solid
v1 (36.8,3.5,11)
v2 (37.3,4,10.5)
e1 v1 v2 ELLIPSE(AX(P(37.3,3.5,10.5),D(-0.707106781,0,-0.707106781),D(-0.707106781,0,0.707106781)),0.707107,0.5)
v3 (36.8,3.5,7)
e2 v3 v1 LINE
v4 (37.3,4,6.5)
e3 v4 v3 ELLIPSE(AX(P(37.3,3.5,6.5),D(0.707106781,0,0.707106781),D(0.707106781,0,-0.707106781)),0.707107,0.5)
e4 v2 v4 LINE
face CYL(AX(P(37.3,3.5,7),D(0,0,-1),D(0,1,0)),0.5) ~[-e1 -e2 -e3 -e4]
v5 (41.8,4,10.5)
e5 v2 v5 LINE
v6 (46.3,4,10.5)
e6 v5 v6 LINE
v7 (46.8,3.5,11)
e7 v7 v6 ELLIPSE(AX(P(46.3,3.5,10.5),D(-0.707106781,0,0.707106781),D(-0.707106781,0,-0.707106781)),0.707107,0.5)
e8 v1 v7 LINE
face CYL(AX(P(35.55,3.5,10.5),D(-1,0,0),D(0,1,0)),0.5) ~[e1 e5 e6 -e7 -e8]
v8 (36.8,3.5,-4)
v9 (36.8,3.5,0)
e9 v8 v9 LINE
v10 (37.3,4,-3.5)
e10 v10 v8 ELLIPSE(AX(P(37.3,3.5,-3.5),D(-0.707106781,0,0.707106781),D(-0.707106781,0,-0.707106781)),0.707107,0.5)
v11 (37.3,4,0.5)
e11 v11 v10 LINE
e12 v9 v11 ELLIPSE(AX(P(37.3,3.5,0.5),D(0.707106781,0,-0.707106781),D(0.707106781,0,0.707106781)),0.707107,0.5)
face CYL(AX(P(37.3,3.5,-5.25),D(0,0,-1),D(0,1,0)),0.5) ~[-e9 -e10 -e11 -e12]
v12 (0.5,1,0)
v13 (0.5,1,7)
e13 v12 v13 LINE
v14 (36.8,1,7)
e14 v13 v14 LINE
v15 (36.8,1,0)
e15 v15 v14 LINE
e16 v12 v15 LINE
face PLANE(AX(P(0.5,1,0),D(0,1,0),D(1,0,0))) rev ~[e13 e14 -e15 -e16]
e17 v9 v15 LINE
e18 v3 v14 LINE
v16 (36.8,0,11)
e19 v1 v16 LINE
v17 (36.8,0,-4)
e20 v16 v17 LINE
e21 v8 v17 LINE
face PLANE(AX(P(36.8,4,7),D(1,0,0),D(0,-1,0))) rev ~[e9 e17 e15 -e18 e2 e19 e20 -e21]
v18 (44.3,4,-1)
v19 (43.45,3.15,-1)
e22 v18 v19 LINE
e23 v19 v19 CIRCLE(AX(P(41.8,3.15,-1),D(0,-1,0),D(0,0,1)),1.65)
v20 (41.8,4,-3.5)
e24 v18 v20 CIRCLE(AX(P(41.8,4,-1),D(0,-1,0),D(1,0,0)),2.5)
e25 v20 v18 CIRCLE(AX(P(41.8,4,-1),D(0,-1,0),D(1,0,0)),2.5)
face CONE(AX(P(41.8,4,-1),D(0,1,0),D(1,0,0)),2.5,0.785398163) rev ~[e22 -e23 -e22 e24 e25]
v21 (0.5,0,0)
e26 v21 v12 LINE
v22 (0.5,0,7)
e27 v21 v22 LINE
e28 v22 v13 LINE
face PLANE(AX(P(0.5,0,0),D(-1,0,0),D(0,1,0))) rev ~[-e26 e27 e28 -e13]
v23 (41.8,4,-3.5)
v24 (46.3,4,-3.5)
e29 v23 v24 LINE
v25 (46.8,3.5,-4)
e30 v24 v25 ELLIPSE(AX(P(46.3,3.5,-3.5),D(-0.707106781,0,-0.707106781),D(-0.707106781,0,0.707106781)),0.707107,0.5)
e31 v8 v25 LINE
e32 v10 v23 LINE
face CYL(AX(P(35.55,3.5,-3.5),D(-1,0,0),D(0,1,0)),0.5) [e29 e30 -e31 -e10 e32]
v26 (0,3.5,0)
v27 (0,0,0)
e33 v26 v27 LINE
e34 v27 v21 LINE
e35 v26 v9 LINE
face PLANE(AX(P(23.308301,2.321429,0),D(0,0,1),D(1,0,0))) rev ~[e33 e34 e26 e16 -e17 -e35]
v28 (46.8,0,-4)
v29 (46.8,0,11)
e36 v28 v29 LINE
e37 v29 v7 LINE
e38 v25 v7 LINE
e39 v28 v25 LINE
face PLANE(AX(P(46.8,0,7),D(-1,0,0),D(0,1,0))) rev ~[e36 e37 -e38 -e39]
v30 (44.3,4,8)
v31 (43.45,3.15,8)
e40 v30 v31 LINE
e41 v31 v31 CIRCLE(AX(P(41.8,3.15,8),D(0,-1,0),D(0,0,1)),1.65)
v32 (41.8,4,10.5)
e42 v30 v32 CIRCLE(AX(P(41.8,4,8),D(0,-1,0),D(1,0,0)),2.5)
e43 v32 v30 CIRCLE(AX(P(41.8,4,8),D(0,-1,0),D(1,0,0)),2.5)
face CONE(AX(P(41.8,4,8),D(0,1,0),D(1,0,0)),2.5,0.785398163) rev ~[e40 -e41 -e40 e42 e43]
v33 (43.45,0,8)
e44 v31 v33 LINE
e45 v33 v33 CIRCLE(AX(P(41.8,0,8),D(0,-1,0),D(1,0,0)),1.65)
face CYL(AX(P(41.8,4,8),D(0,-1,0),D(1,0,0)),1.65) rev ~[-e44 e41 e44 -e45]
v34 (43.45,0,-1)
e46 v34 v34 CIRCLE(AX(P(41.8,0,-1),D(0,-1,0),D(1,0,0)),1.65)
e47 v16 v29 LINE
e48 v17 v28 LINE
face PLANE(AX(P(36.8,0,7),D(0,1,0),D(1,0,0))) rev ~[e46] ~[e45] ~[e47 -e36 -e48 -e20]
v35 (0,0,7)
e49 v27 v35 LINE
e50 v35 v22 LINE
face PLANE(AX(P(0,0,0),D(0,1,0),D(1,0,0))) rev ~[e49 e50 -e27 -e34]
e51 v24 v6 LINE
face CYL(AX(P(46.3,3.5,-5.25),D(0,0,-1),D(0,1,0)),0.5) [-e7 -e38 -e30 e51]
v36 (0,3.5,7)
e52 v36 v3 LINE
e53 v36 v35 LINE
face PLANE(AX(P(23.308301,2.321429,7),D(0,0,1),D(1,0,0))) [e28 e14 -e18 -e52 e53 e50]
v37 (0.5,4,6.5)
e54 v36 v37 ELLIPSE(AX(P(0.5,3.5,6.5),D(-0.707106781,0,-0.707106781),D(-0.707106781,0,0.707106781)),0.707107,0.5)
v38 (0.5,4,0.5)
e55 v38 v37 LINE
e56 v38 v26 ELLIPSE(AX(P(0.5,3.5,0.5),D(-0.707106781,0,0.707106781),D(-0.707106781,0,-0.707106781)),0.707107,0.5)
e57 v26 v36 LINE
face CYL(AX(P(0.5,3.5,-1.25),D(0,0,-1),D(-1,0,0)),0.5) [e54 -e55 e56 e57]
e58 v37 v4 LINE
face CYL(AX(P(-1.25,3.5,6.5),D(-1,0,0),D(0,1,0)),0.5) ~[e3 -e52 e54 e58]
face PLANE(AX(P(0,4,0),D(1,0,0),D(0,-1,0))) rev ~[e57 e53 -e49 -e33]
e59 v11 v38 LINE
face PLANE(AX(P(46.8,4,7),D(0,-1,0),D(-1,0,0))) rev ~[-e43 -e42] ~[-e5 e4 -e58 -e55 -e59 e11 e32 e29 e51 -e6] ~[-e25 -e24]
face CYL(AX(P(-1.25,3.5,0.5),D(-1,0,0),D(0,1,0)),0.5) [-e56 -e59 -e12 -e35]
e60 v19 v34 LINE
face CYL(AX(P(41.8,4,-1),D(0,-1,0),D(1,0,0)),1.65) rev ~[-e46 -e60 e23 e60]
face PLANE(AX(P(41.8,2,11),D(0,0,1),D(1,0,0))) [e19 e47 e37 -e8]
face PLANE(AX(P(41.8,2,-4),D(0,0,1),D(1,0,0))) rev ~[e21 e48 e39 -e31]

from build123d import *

# Parameters (mm, degrees)
F3_DEPTH       = 7
F5_DEPTH       = 4
F5_DEPTH_BACK  = 11
F7_D           = 3.3
F7_CSINK_D     = 5
F7_CSINK_ANGLE = 90
F8_T1_DEPTH    = 38.05
F8_T3_DEPTH    = 9.5
F8_T5_DEPTH    = 12.5
F8_T7_DEPTH    = 5.25
F8_T9_DEPTH    = 5.25
F8_T11_DEPTH   = 17.5
F8_T17_DEPTH   = 39.3
F8_T21_DEPTH   = 6.5
F8_T28_DEPTH   = 39.3
F8_T32_DEPTH   = 6.5


# Not quite as in the source:
# - a fillet or chamfer that OpenCascade refuses, or shapes differently, is made with other operations: its cross-section is extruded or revolved along the edge and cut away or added


with BuildPart() as f3:
    # F2 (on Top) → F3 (new body)
    with BuildSketch(Plane.XY):
        Polygon((0, 4), (0, 0), (0.5, 0), (0.5, 1), (36.8, 1), (36.8, 0), (46.8, 0), (46.8, 4), align=None)
    extrude(amount=F3_DEPTH)

    # F4 (on face) → F5 (join, two sides)
    with BuildSketch(Plane.XY.offset(7)) as f5_sk:
        Polygon((36.8, 1), (36.8, 0), (46.8, 0), (46.8, 4), (36.8, 4), align=None)
    extrude(amount=F5_DEPTH)
    extrude(f5_sk.sketch, amount=-F5_DEPTH_BACK)

    # F7 (through all)
    with Locations(Plane(origin=(0, 4, 0), x_dir=(-1, 0, 0), z_dir=(0, 1, 0))):
        with Locations((-41.8, 8), (-41.8, -1)):
            CounterSinkHole(F7_D / 2, F7_CSINK_D / 2, counter_sink_angle=F7_CSINK_ANGLE)

    # F8: fillet of radius 0.5 on 8 edges, made by hand

    # F8_s2 → F8_t1 (cut)
    with BuildSketch(Plane.YZ.offset(-1.25)):
        with BuildLine():
            ThreePointArc((4, 6.5), (3.8535533906, 6.8535533906), (3.5, 7))
            Line((3.5, 7), (4, 7))
            Line((4, 7), (4, 6.5))
        make_face()
        with BuildLine():
            ThreePointArc((4, 0.5), (3.8535533906, 0.1464466094), (3.5, 0))
            Line((3.5, 0), (4, 0))
            Line((4, 0), (4, 0.5))
        make_face()
    extrude(amount=F8_T1_DEPTH, mode=Mode.SUBTRACT)

    # F8_s4 → F8_t3 (cut)
    with BuildSketch(Plane.XY.offset(-1.25)):
        with BuildLine():
            ThreePointArc((0, 3.5), (0.1464466094, 3.8535533906), (0.5, 4))
            Line((0.5, 4), (0, 4))
            Line((0, 4), (0, 3.5))
        make_face()
    extrude(amount=F8_T3_DEPTH, mode=Mode.SUBTRACT)

    # F8_s6 → F8_t5 (cut)
    with BuildSketch(Plane.YZ.offset(35.55)):
        with BuildLine():
            ThreePointArc((4, -3.5), (3.8535533906, -3.8535533906), (3.5, -4))
            Line((3.5, -4), (4, -4))
            Line((4, -4), (4, -3.5))
        make_face()
        with BuildLine():
            ThreePointArc((4, 10.5), (3.8535533906, 10.8535533906), (3.5, 11))
            Line((3.5, 11), (4, 11))
            Line((4, 11), (4, 10.5))
        make_face()
    extrude(amount=F8_T5_DEPTH, mode=Mode.SUBTRACT)

    # F8_s8 → F8_t7 (cut)
    with BuildSketch(Plane.XY.offset(-5.25)):
        with BuildLine():
            ThreePointArc((37.3, 4), (36.9464466094, 3.8535533906), (36.8, 3.5))
            Line((36.8, 3.5), (36.8, 4))
            Line((36.8, 4), (37.3, 4))
        make_face()
    extrude(amount=F8_T7_DEPTH, mode=Mode.SUBTRACT)

    # F8_s10 → F8_t9 (cut)
    with BuildSketch(Plane.XY.offset(7)):
        with BuildLine():
            ThreePointArc((37.3, 4), (36.9464466094, 3.8535533906), (36.8, 3.5))
            Line((36.8, 3.5), (36.8, 4))
            Line((36.8, 4), (37.3, 4))
        make_face()
    extrude(amount=F8_T9_DEPTH, mode=Mode.SUBTRACT)

    # F8_s12 → F8_t11 (cut)
    with BuildSketch(Plane.XY.offset(-5.25)):
        with BuildLine():
            ThreePointArc((46.3, 4), (46.6535533906, 3.8535533906), (46.8, 3.5))
            Line((46.8, 3.5), (46.8, 4))
            Line((46.8, 4), (46.3, 4))
        make_face()
    extrude(amount=F8_T11_DEPTH, mode=Mode.SUBTRACT)


with BuildPart() as f8_tool15:
    # F8_s16 → F8_t17 (new body)
    with BuildSketch(Plane.YZ.offset(38.05)):
        with BuildLine():
            ThreePointArc((4, 6.5), (3.8535533906, 6.8535533906), (3.5, 7))
            Line((3.5, 7), (4, 7))
            Line((4, 7), (4, 6.5))
        make_face()
    extrude(amount=-F8_T17_DEPTH)

    split(bisect_by=Plane.YZ.offset(36.8), keep=Keep.TOP)


with BuildPart() as f8_tool19:
    # F8_s20 → F8_t21 (new body)
    with BuildSketch(Plane.XY.offset(12.25)):
        with BuildLine():
            ThreePointArc((37.3, 4), (36.9464466094, 3.8535533906), (36.8, 3.5))
            Line((36.8, 3.5), (36.8, 4))
            Line((36.8, 4), (37.3, 4))
        make_face()
    extrude(amount=-F8_T21_DEPTH)

    split(bisect_by=Plane.XY.offset(7), keep=Keep.BOTTOM)


with BuildPart() as f8_tool15_1:
    add(f8_tool15.part)

    # F8_t23: intersect F8_tool19
    add(f8_tool19.part, mode=Mode.INTERSECT)


with BuildPart() as f3_1:
    add(f3.part)

    # F8_t13: cut F8_tool15
    add(f8_tool15_1.part, mode=Mode.SUBTRACT)


with BuildPart() as f8_tool26:
    # F8_s27 → F8_t28 (new body)
    with BuildSketch(Plane.YZ.offset(38.05)):
        with BuildLine():
            ThreePointArc((4, 0.5), (3.8535533906, 0.1464466094), (3.5, 0))
            Line((3.5, 0), (4, 0))
            Line((4, 0), (4, 0.5))
        make_face()
    extrude(amount=-F8_T28_DEPTH)

    split(bisect_by=Plane.YZ.offset(36.8), keep=Keep.TOP)


with BuildPart() as f8_tool30:
    # F8_s31 → F8_t32 (new body)
    with BuildSketch(Plane.XY.offset(1.25)):
        with BuildLine():
            ThreePointArc((37.3, 4), (36.9464466094, 3.8535533906), (36.8, 3.5))
            Line((36.8, 3.5), (36.8, 4))
            Line((36.8, 4), (37.3, 4))
        make_face()
    extrude(amount=-F8_T32_DEPTH)

    split(bisect_by=Plane.XY, keep=Keep.TOP)


with BuildPart() as f8_tool26_1:
    add(f8_tool26.part)

    # F8_t34: intersect F8_tool30
    add(f8_tool30.part, mode=Mode.INTERSECT)


with BuildPart() as f3_2:
    add(f3_1.part)

    # F8_t24: cut F8_tool26
    add(f8_tool26_1.part, mode=Mode.SUBTRACT)


solid = f3_2.part
